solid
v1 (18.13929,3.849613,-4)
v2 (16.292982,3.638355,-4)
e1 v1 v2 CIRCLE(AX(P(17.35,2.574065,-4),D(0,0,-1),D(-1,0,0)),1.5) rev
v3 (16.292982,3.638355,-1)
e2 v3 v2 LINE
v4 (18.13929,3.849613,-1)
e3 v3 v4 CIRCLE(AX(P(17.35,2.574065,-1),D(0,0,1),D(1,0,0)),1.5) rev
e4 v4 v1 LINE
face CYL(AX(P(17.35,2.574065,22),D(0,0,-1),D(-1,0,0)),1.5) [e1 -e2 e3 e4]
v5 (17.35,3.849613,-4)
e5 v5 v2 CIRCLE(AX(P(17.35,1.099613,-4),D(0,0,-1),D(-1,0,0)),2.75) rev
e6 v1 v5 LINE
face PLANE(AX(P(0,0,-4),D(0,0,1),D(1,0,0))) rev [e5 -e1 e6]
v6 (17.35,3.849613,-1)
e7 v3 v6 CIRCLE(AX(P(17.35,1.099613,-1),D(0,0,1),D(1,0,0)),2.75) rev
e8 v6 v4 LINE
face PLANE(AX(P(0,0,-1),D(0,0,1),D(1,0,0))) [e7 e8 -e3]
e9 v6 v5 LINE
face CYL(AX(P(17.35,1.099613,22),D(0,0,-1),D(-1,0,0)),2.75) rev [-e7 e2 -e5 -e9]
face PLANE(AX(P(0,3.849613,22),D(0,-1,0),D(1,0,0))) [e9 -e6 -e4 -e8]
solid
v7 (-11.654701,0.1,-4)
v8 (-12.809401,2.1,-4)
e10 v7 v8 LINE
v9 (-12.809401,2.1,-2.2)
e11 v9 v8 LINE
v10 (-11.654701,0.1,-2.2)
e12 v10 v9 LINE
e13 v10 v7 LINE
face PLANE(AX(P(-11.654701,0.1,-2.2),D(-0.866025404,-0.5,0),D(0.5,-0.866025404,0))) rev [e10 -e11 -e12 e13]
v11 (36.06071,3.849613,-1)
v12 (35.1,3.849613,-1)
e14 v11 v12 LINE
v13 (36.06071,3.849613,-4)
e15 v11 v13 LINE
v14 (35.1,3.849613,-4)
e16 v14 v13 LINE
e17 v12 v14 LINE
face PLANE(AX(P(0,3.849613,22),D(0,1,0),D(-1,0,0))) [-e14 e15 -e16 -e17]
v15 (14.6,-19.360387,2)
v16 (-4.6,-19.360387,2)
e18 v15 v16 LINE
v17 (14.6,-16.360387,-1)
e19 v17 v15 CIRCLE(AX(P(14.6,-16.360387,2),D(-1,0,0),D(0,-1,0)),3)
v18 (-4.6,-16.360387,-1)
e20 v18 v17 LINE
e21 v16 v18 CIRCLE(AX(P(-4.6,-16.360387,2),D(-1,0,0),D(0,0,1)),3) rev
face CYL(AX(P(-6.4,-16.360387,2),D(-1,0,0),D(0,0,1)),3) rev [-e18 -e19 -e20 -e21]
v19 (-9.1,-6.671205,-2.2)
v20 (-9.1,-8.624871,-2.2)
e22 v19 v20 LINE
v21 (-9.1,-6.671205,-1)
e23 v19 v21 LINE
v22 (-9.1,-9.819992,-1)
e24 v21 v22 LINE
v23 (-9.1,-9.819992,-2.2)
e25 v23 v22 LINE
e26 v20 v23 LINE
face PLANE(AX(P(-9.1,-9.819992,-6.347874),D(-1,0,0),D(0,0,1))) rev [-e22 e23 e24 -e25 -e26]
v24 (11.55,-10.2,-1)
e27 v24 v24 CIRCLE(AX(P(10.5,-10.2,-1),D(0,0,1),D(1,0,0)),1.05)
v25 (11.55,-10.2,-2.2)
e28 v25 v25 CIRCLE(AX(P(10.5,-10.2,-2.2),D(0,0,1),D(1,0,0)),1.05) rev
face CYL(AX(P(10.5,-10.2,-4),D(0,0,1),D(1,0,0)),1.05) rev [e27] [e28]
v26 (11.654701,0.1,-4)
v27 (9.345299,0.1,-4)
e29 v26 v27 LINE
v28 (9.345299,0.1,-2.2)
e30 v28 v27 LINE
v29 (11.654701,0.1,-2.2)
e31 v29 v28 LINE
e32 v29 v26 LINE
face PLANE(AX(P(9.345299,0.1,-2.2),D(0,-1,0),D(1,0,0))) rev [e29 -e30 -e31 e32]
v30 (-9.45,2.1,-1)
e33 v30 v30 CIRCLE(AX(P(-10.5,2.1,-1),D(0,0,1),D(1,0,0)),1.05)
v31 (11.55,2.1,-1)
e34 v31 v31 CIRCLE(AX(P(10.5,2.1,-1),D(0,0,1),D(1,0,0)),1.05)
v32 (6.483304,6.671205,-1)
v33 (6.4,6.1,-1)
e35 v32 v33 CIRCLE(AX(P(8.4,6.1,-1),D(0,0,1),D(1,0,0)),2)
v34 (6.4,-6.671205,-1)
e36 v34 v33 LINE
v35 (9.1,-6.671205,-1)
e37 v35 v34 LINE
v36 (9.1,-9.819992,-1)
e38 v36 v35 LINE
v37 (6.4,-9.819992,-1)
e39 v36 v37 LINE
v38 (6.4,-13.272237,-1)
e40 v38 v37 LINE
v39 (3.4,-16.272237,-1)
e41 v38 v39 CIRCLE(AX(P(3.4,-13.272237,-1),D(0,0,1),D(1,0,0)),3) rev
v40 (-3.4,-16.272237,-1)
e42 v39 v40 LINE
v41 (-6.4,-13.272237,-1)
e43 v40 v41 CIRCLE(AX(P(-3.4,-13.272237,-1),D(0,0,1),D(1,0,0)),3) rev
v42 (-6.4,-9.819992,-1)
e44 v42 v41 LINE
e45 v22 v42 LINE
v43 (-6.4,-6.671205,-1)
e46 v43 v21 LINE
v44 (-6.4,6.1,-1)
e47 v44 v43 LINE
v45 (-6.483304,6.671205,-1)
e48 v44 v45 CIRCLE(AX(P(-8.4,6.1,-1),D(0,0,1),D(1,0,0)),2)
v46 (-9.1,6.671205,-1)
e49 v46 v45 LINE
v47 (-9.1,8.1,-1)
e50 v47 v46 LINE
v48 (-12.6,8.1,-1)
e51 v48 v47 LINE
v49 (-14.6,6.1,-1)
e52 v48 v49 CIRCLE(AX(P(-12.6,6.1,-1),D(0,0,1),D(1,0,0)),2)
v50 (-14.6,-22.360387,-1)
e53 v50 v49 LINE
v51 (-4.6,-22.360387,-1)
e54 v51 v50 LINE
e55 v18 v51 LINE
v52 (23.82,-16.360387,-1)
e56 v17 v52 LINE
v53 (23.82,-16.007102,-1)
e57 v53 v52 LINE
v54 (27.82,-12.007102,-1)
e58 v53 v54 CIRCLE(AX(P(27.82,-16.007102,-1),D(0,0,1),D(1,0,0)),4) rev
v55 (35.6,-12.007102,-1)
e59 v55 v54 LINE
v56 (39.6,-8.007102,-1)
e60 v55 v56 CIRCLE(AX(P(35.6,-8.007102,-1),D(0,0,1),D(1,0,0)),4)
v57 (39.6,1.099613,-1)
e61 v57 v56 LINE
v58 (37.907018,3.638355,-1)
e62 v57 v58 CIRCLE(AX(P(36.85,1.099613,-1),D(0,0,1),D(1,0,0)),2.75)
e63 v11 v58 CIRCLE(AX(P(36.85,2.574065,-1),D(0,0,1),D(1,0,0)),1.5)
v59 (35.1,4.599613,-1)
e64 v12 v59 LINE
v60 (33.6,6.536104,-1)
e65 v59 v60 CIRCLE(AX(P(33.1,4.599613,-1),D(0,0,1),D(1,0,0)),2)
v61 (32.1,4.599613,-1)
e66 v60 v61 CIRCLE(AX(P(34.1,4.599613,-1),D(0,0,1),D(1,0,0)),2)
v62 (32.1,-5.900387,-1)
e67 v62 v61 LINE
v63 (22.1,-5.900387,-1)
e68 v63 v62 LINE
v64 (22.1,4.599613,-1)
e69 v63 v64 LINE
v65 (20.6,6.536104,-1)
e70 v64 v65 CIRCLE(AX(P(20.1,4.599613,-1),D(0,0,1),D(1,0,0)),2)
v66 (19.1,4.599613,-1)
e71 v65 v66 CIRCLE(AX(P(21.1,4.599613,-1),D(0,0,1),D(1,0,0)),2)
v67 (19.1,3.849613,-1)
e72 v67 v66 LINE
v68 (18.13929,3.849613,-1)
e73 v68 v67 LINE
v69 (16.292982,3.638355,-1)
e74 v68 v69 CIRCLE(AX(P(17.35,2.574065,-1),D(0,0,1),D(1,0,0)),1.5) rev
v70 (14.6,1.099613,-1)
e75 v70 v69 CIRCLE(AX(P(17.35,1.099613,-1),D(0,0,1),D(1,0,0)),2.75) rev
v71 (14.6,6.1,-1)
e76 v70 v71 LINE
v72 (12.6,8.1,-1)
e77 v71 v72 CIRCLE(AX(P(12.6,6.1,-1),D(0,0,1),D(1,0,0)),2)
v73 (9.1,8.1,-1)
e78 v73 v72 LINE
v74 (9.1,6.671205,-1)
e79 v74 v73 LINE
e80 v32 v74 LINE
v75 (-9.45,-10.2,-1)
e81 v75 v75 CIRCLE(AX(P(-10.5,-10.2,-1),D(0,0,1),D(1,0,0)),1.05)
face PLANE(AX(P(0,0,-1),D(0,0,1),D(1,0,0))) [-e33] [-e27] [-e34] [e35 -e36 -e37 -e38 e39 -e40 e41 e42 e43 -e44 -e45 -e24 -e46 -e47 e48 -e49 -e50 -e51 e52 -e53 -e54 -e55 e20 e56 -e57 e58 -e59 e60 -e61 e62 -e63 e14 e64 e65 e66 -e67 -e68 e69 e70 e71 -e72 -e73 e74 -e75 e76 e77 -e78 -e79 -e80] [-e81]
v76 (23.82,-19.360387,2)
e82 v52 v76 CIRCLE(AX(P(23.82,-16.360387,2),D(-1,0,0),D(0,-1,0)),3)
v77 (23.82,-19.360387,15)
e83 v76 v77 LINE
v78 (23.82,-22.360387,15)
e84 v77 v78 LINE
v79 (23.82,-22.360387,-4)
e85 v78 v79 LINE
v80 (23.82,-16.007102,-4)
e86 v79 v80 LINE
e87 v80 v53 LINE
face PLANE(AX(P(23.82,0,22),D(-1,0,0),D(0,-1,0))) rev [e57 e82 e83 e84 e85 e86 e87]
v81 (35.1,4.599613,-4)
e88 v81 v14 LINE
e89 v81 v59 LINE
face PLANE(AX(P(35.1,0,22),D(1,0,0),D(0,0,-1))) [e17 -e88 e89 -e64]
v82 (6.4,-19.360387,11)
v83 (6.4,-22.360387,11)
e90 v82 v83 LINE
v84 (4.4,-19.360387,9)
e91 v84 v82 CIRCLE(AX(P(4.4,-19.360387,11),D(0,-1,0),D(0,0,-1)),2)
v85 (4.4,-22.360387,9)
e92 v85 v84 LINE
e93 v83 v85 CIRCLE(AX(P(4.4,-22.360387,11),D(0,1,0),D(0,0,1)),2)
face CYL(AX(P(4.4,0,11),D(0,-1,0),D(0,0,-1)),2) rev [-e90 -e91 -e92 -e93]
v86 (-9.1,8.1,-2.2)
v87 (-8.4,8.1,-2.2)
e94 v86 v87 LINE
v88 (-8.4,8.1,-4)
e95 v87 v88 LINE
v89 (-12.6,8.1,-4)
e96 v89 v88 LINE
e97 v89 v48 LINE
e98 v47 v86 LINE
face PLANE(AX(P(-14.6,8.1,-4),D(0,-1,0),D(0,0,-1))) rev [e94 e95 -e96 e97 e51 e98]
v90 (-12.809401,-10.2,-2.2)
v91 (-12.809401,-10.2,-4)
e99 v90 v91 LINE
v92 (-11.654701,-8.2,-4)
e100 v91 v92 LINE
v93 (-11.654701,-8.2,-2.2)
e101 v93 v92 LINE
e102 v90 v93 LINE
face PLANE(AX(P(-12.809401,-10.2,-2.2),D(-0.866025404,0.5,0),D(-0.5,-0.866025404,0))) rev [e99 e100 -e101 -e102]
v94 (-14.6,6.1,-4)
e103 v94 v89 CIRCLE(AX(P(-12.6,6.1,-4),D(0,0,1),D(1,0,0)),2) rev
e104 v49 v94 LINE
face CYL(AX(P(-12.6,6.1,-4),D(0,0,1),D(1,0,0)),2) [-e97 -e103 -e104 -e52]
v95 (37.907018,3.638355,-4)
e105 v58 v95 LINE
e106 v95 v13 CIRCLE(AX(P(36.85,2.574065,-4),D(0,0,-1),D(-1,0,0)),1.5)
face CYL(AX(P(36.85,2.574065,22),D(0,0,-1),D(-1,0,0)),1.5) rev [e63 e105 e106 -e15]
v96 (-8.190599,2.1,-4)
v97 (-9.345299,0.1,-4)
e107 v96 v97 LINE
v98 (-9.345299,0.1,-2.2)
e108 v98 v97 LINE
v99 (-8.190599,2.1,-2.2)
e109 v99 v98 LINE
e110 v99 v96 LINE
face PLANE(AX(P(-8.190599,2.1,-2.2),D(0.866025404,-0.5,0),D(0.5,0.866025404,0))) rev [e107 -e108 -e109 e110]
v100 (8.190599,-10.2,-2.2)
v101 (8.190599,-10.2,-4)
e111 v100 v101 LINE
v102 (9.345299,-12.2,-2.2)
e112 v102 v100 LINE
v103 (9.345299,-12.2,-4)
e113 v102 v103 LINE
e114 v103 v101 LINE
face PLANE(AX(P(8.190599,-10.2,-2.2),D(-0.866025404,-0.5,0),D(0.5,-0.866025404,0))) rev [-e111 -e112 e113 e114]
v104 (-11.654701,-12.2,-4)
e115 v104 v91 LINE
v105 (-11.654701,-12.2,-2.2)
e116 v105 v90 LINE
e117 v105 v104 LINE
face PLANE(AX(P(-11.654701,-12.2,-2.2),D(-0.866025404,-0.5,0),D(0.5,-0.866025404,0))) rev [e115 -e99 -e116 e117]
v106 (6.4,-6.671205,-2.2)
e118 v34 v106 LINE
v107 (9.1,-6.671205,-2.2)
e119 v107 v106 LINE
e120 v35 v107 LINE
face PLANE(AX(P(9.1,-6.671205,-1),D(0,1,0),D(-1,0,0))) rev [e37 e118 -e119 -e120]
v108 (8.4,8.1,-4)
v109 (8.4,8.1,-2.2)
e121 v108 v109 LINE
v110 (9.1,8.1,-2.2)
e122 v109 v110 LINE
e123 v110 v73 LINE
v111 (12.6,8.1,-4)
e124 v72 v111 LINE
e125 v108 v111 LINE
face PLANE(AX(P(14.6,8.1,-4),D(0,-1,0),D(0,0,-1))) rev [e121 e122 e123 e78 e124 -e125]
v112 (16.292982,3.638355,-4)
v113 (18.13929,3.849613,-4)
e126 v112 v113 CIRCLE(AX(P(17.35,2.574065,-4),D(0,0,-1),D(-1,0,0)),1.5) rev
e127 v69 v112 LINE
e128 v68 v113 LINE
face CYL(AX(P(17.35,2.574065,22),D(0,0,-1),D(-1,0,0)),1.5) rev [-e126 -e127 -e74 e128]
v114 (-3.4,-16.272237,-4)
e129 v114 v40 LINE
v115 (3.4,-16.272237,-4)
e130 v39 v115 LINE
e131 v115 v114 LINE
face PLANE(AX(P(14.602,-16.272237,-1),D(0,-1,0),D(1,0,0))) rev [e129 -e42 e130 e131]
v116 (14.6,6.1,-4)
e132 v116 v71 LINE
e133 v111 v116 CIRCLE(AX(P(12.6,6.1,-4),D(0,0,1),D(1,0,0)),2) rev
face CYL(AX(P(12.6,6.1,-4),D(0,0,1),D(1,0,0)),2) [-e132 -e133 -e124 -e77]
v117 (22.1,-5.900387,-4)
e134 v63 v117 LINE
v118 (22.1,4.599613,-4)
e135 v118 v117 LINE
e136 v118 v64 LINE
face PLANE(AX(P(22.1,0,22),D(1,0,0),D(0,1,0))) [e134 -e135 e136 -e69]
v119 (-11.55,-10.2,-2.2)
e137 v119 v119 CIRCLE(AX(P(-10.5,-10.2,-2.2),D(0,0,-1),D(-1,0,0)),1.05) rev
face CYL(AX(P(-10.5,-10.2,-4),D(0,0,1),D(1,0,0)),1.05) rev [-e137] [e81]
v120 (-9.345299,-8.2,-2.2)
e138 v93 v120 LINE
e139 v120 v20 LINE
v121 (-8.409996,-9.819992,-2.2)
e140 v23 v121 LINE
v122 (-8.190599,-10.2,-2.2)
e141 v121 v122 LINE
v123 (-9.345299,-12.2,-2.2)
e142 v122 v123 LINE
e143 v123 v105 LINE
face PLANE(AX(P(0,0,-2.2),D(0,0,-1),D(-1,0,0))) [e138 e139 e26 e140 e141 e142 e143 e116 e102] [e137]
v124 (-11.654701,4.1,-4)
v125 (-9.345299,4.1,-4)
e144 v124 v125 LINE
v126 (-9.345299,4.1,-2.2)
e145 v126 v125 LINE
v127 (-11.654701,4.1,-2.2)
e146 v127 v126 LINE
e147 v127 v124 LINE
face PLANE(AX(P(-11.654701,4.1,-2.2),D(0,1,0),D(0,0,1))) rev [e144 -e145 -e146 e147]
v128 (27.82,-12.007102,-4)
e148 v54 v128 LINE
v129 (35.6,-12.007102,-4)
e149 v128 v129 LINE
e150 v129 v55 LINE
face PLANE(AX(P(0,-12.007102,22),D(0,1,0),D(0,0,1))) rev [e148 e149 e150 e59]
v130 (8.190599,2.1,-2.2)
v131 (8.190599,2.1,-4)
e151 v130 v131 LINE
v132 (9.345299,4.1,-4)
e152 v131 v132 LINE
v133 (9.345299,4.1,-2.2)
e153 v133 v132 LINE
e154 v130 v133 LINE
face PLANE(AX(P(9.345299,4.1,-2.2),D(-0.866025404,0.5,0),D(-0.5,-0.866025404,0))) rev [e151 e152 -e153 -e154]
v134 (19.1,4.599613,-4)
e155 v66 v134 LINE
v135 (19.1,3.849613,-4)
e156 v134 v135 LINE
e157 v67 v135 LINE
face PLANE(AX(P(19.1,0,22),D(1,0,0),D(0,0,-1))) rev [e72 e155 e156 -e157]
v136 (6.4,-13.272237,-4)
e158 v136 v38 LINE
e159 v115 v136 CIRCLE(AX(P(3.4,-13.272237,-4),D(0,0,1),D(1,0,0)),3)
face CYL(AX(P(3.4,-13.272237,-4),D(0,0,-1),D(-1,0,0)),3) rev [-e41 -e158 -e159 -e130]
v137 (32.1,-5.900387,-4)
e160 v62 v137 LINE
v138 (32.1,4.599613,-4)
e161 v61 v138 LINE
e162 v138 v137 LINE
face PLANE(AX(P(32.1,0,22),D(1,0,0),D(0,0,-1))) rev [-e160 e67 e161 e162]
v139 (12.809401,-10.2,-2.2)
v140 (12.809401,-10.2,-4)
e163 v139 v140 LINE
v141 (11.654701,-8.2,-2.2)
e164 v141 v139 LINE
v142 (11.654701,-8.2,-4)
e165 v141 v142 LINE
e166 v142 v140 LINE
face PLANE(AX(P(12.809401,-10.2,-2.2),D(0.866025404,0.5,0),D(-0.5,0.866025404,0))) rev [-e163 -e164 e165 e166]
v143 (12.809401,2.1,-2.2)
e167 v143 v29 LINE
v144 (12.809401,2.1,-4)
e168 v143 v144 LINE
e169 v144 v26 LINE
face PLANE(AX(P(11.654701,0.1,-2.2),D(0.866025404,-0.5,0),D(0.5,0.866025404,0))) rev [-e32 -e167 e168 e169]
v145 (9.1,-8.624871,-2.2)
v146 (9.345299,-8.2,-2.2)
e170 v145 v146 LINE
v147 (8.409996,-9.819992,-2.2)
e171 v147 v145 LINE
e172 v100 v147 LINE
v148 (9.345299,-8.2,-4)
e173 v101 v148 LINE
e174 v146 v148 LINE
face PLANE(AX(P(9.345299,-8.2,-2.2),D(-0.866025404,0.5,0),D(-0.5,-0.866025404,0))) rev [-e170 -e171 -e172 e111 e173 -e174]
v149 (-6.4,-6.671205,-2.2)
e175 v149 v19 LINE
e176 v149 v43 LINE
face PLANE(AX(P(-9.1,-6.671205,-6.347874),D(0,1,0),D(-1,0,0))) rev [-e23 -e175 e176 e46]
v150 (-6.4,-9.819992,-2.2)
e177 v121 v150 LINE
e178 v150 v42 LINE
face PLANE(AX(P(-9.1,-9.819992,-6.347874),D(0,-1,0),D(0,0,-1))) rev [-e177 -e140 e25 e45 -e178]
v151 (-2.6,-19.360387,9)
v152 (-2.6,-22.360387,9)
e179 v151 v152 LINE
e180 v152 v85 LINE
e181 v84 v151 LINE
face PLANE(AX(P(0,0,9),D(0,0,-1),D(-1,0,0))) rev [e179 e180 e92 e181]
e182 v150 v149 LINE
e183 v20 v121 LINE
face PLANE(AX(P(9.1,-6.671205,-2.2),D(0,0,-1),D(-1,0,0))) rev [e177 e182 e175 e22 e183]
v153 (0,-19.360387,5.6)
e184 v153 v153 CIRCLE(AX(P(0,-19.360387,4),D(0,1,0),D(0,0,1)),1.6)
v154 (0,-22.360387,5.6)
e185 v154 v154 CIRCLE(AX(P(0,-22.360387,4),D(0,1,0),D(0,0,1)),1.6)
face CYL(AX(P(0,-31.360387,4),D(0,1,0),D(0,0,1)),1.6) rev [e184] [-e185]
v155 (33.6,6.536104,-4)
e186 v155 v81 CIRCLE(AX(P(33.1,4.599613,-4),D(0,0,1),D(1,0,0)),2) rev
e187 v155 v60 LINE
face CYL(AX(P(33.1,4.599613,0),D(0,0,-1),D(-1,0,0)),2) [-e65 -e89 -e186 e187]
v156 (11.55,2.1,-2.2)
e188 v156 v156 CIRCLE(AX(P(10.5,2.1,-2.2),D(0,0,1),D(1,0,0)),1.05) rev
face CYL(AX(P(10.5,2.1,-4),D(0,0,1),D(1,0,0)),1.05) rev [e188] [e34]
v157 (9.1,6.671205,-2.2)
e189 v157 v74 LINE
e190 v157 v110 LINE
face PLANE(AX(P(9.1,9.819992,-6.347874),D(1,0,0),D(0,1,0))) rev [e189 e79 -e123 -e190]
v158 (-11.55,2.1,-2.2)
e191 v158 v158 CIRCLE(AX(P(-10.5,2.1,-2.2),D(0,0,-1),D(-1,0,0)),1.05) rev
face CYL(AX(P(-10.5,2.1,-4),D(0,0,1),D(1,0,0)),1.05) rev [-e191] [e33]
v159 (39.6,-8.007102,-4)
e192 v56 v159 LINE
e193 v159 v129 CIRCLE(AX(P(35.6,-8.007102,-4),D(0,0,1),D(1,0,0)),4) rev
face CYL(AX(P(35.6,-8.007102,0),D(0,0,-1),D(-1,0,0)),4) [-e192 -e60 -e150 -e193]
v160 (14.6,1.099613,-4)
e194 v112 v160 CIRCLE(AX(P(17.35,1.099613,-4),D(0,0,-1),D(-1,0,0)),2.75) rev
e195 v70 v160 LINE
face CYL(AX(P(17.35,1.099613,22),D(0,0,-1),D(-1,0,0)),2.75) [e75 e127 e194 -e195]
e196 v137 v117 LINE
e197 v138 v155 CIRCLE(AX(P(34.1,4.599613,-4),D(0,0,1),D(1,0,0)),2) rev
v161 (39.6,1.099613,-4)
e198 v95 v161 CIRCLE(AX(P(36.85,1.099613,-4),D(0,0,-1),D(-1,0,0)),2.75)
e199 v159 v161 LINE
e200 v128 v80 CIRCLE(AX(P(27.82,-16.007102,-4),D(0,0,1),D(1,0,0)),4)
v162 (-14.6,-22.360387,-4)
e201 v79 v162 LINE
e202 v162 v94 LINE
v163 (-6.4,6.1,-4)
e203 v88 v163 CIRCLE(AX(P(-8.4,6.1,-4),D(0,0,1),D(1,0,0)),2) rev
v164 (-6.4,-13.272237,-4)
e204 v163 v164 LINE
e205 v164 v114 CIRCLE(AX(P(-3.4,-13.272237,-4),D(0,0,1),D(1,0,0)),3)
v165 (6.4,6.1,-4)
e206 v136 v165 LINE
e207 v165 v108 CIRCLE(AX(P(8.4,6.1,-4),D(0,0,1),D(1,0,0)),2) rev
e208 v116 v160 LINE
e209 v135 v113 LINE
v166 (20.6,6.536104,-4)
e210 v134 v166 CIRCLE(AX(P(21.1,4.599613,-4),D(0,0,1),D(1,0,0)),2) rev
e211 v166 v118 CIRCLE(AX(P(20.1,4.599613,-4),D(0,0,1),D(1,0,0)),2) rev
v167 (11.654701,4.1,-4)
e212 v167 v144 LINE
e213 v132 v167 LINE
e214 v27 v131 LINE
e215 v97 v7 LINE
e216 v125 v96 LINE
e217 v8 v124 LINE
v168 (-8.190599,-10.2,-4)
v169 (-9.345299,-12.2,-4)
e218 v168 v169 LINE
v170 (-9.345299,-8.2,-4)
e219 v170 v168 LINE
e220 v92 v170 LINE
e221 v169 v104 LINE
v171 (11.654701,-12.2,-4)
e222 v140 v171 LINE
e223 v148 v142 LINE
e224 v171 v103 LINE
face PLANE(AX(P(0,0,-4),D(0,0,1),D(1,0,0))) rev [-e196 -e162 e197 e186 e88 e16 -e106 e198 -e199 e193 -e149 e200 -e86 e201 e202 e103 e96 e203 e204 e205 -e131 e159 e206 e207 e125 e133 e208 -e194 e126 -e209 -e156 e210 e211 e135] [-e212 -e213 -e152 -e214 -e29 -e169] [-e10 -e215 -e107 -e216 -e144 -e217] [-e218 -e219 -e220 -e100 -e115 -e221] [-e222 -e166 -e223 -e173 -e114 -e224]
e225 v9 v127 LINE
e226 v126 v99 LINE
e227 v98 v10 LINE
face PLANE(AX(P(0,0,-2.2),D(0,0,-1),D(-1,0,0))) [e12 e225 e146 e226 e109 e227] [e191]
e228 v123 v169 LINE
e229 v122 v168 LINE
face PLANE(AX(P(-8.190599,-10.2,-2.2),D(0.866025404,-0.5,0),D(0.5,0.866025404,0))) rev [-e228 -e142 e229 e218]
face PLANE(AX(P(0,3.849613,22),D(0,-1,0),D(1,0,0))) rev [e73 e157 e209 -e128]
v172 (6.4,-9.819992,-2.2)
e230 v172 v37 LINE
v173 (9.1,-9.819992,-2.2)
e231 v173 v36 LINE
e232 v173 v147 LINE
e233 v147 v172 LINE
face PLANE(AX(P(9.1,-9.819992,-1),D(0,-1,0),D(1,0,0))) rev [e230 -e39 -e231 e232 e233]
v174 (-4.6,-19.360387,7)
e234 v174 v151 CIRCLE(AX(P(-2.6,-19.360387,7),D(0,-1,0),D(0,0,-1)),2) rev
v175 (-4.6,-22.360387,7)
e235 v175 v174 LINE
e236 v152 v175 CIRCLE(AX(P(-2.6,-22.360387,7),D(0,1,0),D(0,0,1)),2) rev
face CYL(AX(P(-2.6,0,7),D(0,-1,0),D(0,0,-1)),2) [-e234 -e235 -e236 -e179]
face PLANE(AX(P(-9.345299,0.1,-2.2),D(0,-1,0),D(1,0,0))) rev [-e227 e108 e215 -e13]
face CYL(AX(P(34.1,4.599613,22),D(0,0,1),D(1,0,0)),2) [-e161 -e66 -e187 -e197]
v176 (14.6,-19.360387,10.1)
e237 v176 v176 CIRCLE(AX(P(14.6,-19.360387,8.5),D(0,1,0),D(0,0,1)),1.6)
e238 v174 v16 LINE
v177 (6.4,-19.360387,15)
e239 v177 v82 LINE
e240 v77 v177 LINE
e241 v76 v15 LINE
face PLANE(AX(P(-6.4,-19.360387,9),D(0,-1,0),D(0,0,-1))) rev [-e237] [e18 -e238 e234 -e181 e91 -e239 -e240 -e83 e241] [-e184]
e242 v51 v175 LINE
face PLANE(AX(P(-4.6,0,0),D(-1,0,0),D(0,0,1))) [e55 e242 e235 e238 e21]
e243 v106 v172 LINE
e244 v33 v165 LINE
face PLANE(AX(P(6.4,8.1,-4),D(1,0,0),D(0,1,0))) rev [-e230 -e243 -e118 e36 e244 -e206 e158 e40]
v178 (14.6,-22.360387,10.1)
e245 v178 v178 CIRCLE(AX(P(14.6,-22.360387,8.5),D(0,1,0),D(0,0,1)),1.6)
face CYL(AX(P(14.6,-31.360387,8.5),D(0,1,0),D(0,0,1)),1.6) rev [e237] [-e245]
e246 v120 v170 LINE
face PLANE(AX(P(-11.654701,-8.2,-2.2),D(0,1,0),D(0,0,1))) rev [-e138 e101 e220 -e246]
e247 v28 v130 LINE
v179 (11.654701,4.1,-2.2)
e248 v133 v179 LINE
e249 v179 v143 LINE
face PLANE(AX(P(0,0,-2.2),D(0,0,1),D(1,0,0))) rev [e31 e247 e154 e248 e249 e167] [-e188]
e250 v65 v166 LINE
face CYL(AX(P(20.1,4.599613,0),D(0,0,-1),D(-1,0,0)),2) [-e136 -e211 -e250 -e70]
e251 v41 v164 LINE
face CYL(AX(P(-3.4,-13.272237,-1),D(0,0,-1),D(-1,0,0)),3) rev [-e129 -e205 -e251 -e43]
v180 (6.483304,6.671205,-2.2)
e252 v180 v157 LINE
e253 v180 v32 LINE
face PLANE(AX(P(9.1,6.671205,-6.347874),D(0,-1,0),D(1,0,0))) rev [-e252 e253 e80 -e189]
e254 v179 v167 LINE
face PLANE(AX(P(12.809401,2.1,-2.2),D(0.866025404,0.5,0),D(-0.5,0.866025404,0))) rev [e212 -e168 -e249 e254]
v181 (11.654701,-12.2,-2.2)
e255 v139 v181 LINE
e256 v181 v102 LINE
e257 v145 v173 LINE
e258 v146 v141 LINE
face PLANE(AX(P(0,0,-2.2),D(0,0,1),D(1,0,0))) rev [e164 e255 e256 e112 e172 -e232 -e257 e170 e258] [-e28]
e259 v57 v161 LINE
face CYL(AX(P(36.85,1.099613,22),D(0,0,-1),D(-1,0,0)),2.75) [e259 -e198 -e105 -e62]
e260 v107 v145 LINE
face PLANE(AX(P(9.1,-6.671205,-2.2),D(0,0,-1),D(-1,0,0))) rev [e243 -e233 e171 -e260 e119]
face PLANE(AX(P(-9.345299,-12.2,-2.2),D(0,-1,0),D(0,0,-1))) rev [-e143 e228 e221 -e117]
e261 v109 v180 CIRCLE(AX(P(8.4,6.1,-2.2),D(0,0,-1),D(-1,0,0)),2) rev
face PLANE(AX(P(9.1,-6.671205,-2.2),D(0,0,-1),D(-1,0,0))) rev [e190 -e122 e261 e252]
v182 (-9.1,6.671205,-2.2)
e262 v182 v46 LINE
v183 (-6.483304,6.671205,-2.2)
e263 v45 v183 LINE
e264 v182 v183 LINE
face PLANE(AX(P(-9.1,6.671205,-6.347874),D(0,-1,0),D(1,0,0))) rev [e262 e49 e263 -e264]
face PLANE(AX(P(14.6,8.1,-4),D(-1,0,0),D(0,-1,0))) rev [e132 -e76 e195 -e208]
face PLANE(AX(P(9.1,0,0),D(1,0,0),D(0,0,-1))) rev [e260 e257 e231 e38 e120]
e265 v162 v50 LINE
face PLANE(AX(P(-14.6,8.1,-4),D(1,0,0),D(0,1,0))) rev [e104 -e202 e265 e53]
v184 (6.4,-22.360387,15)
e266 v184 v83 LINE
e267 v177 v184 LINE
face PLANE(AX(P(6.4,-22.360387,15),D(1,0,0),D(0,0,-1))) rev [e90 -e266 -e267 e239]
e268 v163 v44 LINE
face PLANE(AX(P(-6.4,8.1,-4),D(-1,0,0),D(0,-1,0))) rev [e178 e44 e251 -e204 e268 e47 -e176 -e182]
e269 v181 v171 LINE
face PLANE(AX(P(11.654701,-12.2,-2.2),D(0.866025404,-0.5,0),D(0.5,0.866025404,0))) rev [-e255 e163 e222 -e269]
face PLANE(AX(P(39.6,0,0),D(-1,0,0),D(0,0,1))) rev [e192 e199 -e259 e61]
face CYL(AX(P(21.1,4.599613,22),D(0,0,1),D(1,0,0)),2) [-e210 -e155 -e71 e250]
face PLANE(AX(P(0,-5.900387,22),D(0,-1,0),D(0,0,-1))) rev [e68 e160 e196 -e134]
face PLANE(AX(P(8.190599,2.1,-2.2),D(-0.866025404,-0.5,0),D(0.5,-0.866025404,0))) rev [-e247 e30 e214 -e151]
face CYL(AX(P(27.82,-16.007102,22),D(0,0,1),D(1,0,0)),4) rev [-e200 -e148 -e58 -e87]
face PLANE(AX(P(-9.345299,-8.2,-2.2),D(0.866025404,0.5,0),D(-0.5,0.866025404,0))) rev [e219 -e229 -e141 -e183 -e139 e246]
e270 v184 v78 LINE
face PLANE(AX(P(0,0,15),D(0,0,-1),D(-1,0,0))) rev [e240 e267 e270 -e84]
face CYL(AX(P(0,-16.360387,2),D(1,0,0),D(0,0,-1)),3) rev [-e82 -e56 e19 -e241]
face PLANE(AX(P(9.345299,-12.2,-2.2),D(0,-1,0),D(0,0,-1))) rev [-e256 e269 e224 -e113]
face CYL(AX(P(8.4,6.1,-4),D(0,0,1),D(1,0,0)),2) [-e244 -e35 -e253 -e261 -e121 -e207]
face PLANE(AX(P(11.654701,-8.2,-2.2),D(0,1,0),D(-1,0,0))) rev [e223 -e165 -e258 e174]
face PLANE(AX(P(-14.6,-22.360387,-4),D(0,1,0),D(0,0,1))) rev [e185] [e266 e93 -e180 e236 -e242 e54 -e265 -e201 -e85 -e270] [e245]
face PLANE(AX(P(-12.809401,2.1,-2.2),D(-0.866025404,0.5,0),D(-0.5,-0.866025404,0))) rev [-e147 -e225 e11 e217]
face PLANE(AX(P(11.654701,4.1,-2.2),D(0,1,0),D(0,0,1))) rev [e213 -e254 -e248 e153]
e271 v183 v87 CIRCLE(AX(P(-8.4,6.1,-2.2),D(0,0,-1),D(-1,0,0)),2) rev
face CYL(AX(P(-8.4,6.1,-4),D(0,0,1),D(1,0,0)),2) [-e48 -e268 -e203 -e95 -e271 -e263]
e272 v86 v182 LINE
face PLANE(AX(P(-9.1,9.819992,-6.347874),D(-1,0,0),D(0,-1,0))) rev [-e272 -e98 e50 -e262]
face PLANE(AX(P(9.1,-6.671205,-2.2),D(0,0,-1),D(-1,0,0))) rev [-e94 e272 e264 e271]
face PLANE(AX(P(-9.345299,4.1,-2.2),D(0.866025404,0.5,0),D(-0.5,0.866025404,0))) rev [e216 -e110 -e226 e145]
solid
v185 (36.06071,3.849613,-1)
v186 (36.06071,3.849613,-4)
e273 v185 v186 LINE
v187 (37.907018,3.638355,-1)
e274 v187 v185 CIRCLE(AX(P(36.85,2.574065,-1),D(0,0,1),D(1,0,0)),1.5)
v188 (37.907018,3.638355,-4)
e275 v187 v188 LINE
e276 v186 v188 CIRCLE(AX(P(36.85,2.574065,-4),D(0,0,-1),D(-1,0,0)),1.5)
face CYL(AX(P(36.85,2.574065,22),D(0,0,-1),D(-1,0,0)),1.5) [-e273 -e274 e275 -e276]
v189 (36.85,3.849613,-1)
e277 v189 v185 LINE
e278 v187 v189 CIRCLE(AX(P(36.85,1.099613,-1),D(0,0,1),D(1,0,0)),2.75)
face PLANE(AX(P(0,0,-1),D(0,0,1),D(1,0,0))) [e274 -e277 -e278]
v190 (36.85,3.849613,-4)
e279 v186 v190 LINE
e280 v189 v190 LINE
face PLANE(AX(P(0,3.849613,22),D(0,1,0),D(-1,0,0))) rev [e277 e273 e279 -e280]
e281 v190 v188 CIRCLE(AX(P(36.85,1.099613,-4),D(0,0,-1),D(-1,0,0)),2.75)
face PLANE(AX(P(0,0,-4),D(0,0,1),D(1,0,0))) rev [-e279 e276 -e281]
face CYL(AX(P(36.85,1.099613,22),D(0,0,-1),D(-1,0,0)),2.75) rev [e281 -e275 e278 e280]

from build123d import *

# Parameters (mm, degrees)
ESBO_O2_W                  = 8.2
ESBO_O2_H                  = 30.460387467
RESSALTO_EXTRUS_O1_DEPTH   = 3
RESSALTO_EXTRUS_O1_2_DEPTH = 3
RESSALTO_EXTRUS_O2_REACH   = 32.935
ESBO_O3_W                  = 3
ESBO_O3_H                  = 6.088150409
ESBO_O4_W                  = 12.8
ESBO_O4_H                  = 3
RESSALTO_EXTRUS_O3_DEPTH   = 10
ESBO_O5_W                  = 8.2
ESBO_O5_H                  = 3
RESSALTO_EXTRUS_O4_DEPTH   = 16
ESBO_O8_R                  = 1.05
CORTE_EXTRUS_O3_DEPTH      = 32.131124741
FILETE1_R                  = 3
ESBO_O9_W                  = 1.2
ESBO_O9_H                  = 3.148787123
CORTE_EXTRUS_O4_DEPTH      = 2.7
FILETE2_R                  = 3
CORTE_EXTRUS_O5_DEPTH      = 1.8
ESBO_O13_W                 = 2.7
ESBO_O13_H                 = 3.148787123
CORTE_EXTRUS_O7_DEPTH      = 1.2
ESBO_O14_W                 = 19
ESBO_O14_H                 = 3
RESSALTO_EXTRUS_O5_DEPTH   = 25
ESBO_O15_W                 = 25
ESBO_O15_H                 = 3
RESSALTO_EXTRUS_O6_DEPTH   = 25.96
ESBO_O16_W                 = 10
ESBO_O16_H                 = 12.5
ESBO_O16_W_2               = 15.78
ESBO_O16_H_2               = 7.353285402
CORTE_EXTRUS_O8_DEPTH      = 26
FILETE4_R                  = 4
FILETE5_R                  = 2
CORTE_EXTRUS_O10_DEPTH     = 10
ESBO_O19_W                 = 19
ESBO_O19_H                 = 5
CORTE_EXTRUS_O13_DEPTH     = 15.78
FILETE7_R                  = 4
FILETE8_R                  = 3
ESBO_O20_R                 = 1.6
CORTE_EXTRUS_O14_DEPTH     = 12
FILETE9_R                  = 2


with BuildPart() as part:
    # Esboço2 → Ressalto-extrusão1 (new body)
    with BuildSketch(Plane(origin=(0, 0, -1), x_dir=(-1, 0, 0), z_dir=(0, 0, -1))):
        with Locations((10.5, -7.130193734)):
            Rectangle(ESBO_O2_W, ESBO_O2_H)
    extrude(amount=RESSALTO_EXTRUS_O1_DEPTH)


with BuildPart() as body_2:
    # Esboço2 → Ressalto-extrus_o1 2 (new body)
    with BuildSketch(Plane(origin=(0, 0, -1), x_dir=(-1, 0, 0), z_dir=(0, 0, -1))):
        with Locations((-10.5, -7.130193734)):
            Rectangle(ESBO_O2_W, ESBO_O2_H)
    extrude(amount=RESSALTO_EXTRUS_O1_2_DEPTH)

    # Esboço3 → Ressalto-extrusão2 (add, up to next)
    with BuildSketch(Plane(origin=(-6.4, 0, 0), x_dir=(0, 0, -1), z_dir=(1, 0, 0)), mode=Mode.PRIVATE) as ressalto_extrus_o2_sk1:
        with Locations((2.5, -19.316312263)):
            Rectangle(ESBO_O3_W, ESBO_O3_H)
    ressalto_extrus_o2_tool1 = extrude(ressalto_extrus_o2_sk1.sketch, amount=RESSALTO_EXTRUS_O2_REACH, mode=Mode.PRIVATE) - body_2.part

    add(part.part)  # Ressalto-extrusão2 merges part
    add(ressalto_extrus_o2_tool1.solids().sort_by_distance((-6.4, -19.316312, -2.5))[0])

    # Esboço4 → Ressalto-extrusão3 (add)
    with BuildSketch(Plane.XY.offset(-1)):
        with Locations((0, -20.860387467)):
            Rectangle(ESBO_O4_W, ESBO_O4_H)
    extrude(amount=RESSALTO_EXTRUS_O3_DEPTH)

    # Esboço5 → Ressalto-extrusão4 (add)
    with BuildSketch(Plane.XY.offset(-1)):
        with Locations((-10.5, -20.860387467)):
            Rectangle(ESBO_O5_W, ESBO_O5_H)
        with Locations((10.5, -20.860387467)):
            Rectangle(ESBO_O5_W, ESBO_O5_H)
    extrude(amount=RESSALTO_EXTRUS_O4_DEPTH)

    # Esboço8 → Corte-extrusão3 (cut, through all)
    with BuildSketch(Plane.XY.offset(-1)):
        with Locations((-10.5, 2.1)):
            Circle(ESBO_O8_R)
        with Locations((10.5, 2.1)):
            Circle(ESBO_O8_R)
        with Locations((10.5, -10.2)):
            Circle(ESBO_O8_R)
        with Locations((-10.5, -10.2)):
            Circle(ESBO_O8_R)
    extrude(amount=-CORTE_EXTRUS_O3_DEPTH, mode=Mode.SUBTRACT)

    # Filete1
    filete1_edges = [body_2.edges().sort_by_distance(p)[0] for p in [
        (6.4, -16.272237058, -2.5),
        (-6.4, -16.272237058, -2.5),
    ]]
    fillet(filete1_edges, radius=FILETE1_R)

    # Esboço9 → Corte-extrusão4 (cut)
    with BuildSketch(Plane.ZY.offset(-6.4)):
        with Locations((-1.6, -8.245598841)):
            Rectangle(ESBO_O9_W, ESBO_O9_H)
    extrude(amount=-CORTE_EXTRUS_O4_DEPTH, mode=Mode.SUBTRACT)

    # Filete2
    filete2_edges = [body_2.edges().sort_by_distance(p)[0] for p in [
        (0, -19.360387467, -1),
    ]]
    fillet(filete2_edges, radius=FILETE2_R)

    # Esboço10 → Corte-extrusão5 (cut)
    with BuildSketch(Plane(origin=(0, 0, -4), x_dir=(-1, 0, 0), z_dir=(0, 0, -1))):
        Polygon((12.809401077, 2.1), (11.654700538, 4.1), (9.345299462, 4.1), (8.190598923, 2.1), (9.345299462, 0.1), (11.654700538, 0.1), align=None)
        Polygon((12.809401077, -10.2), (11.654700538, -8.2), (9.345299462, -8.2), (8.190598923, -10.2), (9.345299462, -12.2), (11.654700538, -12.2), align=None)
        Polygon((-11.654700538, -12.2), (-12.809401077, -10.2), (-11.654700538, -8.2), (-9.345299462, -8.2), (-8.190598923, -10.2), (-9.345299462, -12.2), align=None)
        Polygon((-11.654700538, 0.1), (-12.809401077, 2.1), (-11.654700538, 4.1), (-9.345299462, 4.1), (-8.190598923, 2.1), (-9.345299462, 0.1), align=None)
    extrude(amount=-CORTE_EXTRUS_O5_DEPTH, mode=Mode.SUBTRACT)

    # Esboço13 → Corte-extrusão7 (cut)
    with BuildSketch(Plane.XY.offset(-1)):
        with Locations((7.75, -8.245598841)):
            Rectangle(ESBO_O13_W, ESBO_O13_H)
        with Locations((7.75, 8.245598841)):
            Rectangle(ESBO_O13_W, ESBO_O13_H)
        with Locations((-7.75, 8.245598841)):
            Rectangle(ESBO_O13_W, ESBO_O13_H)
        with Locations((-7.75, -8.245598841)):
            Rectangle(ESBO_O13_W, ESBO_O13_H)
    extrude(amount=-CORTE_EXTRUS_O7_DEPTH, mode=Mode.SUBTRACT)

    # Esboço14 → Ressalto-extrusão5 (add)
    with BuildSketch(Plane(origin=(14.6, 0, 0), x_dir=(0, 0, -1), z_dir=(1, 0, 0))):
        with Locations((-5.5, -20.860387467)):
            Rectangle(ESBO_O14_W, ESBO_O14_H)
    extrude(amount=RESSALTO_EXTRUS_O5_DEPTH)

    # Esboço15 → Ressalto-extrusão6 (add)
    with BuildSketch(Plane(origin=(0, -19.360387467, 0), x_dir=(1, 0, 0), z_dir=(0, 1, 0))):
        with Locations((27.1, 2.5)):
            Rectangle(ESBO_O15_W, ESBO_O15_H)
    extrude(amount=RESSALTO_EXTRUS_O6_DEPTH)

    # Esboço16 → Corte-extrusão8 (cut)
    with BuildSketch(Plane(origin=(0, 0, -4), x_dir=(-1, 0, 0), z_dir=(0, 0, -1))):
        with BuildLine():
            Line((-36.06071018, 3.849612533), (-35.1, 3.849612533))
            Line((-35.1, 3.849612533), (-35.1, 6.599612533))
            Line((-35.1, 6.599612533), (-39.6, 6.599612533))
            Line((-39.6, 6.599612533), (-39.6, 1.099612533))
            ThreePointArc((-39.6, 1.099612533), (-39.137935656, 2.625342009), (-37.907017867, 3.638354983))
            ThreePointArc((-37.907017867, 3.638354983), (-37.020519838, 4.064341116), (-36.06071018, 3.849612533))
        make_face()
        with BuildLine():
            ThreePointArc((-37.907017867, 3.638354983), (-36.679480162, 1.083788828), (-36.06071018, 3.849612533))
            Line((-36.06071018, 3.849612533), (-36.85, 3.849612533))
            ThreePointArc((-36.85, 3.849612533), (-37.388961159, 3.796281009), (-37.907017867, 3.638354983))
        make_face()
        with Locations((-27.1, 0.349612533)):
            Rectangle(ESBO_O16_W, ESBO_O16_H)
        with Locations((-31.71, -15.683744766)):
            Rectangle(ESBO_O16_W_2, ESBO_O16_H_2)
        with BuildLine():
            Line((-14.6, 6.599612533), (-19.1, 6.599612533))
            Line((-19.1, 6.599612533), (-19.1, 3.849612533))
            Line((-19.1, 3.849612533), (-18.13928982, 3.849612533))
            ThreePointArc((-18.13928982, 3.849612533), (-17.179480162, 4.064341116), (-16.292982133, 3.638354983))
            ThreePointArc((-16.292982133, 3.638354983), (-15.062064344, 2.625342009), (-14.6, 1.099612533))
            Line((-14.6, 1.099612533), (-14.6, 6.599612533))
        make_face()
        with BuildLine():
            Line((-17.35, 3.849612533), (-18.13928982, 3.849612533))
            ThreePointArc((-18.13928982, 3.849612533), (-17.520519838, 1.083788828), (-16.292982133, 3.638354983))
            ThreePointArc((-16.292982133, 3.638354983), (-16.811038841, 3.796281009), (-17.35, 3.849612533))
        make_face()
    extrude(amount=-CORTE_EXTRUS_O8_DEPTH, mode=Mode.SUBTRACT)


with BuildPart() as corte_extrus_o8_piece_1:
    # of the separate pieces the step leaves, piece 1, a body of its own (corte_extrus_o8_pieces)
    add(body_2.part.solids().sort_by_distance((14.6, -19.360387467, -1))[0])

    # Filete4
    filete4_edges = [corte_extrus_o8_piece_1.edges().sort_by_distance(p)[0] for p in [
        (39.6, -12.007102065, -2.5),
    ]]
    fillet(filete4_edges, radius=FILETE4_R)

    # Filete5
    # the kernel refuses this fillet: 2 mm, written as the material it takes off along each edge
    with BuildSketch(Plane(origin=(32.1, 6.599612533, -9), x_dir=(1, 0, 0), z_dir=(0, 0, 1)), Plane(origin=(19.1, 6.599612533, -9), x_dir=(1, 0, 0), z_dir=(0, 0, 1)), Plane(origin=(35.1, 6.599612533, -9), x_dir=(0, -1, 0), z_dir=(0, 0, 1)), Plane(origin=(22.1, 6.599612533, -9), x_dir=(0, -1, 0), z_dir=(0, 0, 1)), Plane(origin=(14.6, 8.1, 4), x_dir=(-1, 0, 0), z_dir=(0, 0, -1)), Plane(origin=(-14.6, 8.1, 4), x_dir=(0, -1, 0), z_dir=(0, 0, -1))) as filete5_piece_1:
        with BuildLine():
            CenterArc((FILETE5_R, -FILETE5_R), FILETE5_R, 90, 90)
            Line((0, -FILETE5_R), (0, 0))
            Line((0, 0), (FILETE5_R, 0))
        make_face()
    extrude(amount=13, mode=Mode.SUBTRACT)
    with BuildSketch(Plane(origin=(-6.4, 8.1, 2.8), x_dir=(-1, 0, 0), z_dir=(0, 0, -1)), Plane(origin=(6.4, 8.1, 2.8), x_dir=(0, -1, 0), z_dir=(0, 0, -1))) as filete5_piece_2:
        with BuildLine():
            CenterArc((FILETE5_R, -FILETE5_R), FILETE5_R, 90, 90)
            Line((0, -FILETE5_R), (0, 0))
            Line((0, 0), (FILETE5_R, 0))
        make_face()
    extrude(amount=11.8, mode=Mode.SUBTRACT)

    # Esboço18 → Corte-extrusão10 (cut)
    with BuildSketch(Plane.ZY.offset(14.6)):
        Polygon((-1, -16.360387467), (-1, -22.360387467), (15, -22.360387467), (15, -19.360387467), align=None)
    extrude(amount=-CORTE_EXTRUS_O10_DEPTH, mode=Mode.SUBTRACT)

    # Esboço19 → Corte-extrusão13 (cut)
    with BuildSketch(Plane(origin=(39.6, 0, 0), x_dir=(0, 0, -1), z_dir=(1, 0, 0))):
        with Locations((-5.5, -19.860387467)):
            Rectangle(ESBO_O19_W, ESBO_O19_H)
    extrude(amount=-CORTE_EXTRUS_O13_DEPTH, mode=Mode.SUBTRACT)

    # Filete7
    filete7_edges = [corte_extrus_o8_piece_1.edges().sort_by_distance(p)[0] for p in [
        (23.82, -12.007102065, -2.5),
    ]]
    fillet(filete7_edges, radius=FILETE7_R)

    # Filete8
    filete8_edges = [corte_extrus_o8_piece_1.edges().sort_by_distance(p)[0] for p in [
        (19.21, -19.360387467, -1),
    ]]
    fillet(filete8_edges, radius=FILETE8_R)

    # Esboço20 → Corte-extrusão14 (cut)
    with BuildSketch(Plane(origin=(0, -19.360387467, 0), x_dir=(1, 0, 0), z_dir=(0, 1, 0))):
        with Locations(Location((14.6, -8.5, 0), (0, 0, 270))):
            Circle(ESBO_O20_R)
        with Locations(Location((0, -4, 0), (0, 0, 270))):
            Circle(ESBO_O20_R)
    extrude(amount=-CORTE_EXTRUS_O14_DEPTH, mode=Mode.SUBTRACT)

    # Filete9
    filete9_edges = [corte_extrus_o8_piece_1.edges().sort_by_distance(p)[0] for p in [
        (6.4, -20.860387467, 9),
        (-4.6, -20.860387467, 9),
    ]]
    fillet(filete9_edges, radius=FILETE9_R)


with BuildPart() as corte_extrus_o8_piece_2:
    # of the separate pieces the step leaves, piece 2, a body of its own (corte_extrus_o8_pieces)
    add(body_2.part.solids().sort_by_distance((17.35, 3.849612533, -1))[0])


with BuildPart() as corte_extrus_o8_piece_3:
    # of the separate pieces the step leaves, piece 3, a body of its own (corte_extrus_o8_pieces)
    add(body_2.part.solids().sort_by_distance((36.85, 3.849612533, -1))[0])


solid = Compound([corte_extrus_o8_piece_1.part, corte_extrus_o8_piece_2.part, corte_extrus_o8_piece_3.part])
